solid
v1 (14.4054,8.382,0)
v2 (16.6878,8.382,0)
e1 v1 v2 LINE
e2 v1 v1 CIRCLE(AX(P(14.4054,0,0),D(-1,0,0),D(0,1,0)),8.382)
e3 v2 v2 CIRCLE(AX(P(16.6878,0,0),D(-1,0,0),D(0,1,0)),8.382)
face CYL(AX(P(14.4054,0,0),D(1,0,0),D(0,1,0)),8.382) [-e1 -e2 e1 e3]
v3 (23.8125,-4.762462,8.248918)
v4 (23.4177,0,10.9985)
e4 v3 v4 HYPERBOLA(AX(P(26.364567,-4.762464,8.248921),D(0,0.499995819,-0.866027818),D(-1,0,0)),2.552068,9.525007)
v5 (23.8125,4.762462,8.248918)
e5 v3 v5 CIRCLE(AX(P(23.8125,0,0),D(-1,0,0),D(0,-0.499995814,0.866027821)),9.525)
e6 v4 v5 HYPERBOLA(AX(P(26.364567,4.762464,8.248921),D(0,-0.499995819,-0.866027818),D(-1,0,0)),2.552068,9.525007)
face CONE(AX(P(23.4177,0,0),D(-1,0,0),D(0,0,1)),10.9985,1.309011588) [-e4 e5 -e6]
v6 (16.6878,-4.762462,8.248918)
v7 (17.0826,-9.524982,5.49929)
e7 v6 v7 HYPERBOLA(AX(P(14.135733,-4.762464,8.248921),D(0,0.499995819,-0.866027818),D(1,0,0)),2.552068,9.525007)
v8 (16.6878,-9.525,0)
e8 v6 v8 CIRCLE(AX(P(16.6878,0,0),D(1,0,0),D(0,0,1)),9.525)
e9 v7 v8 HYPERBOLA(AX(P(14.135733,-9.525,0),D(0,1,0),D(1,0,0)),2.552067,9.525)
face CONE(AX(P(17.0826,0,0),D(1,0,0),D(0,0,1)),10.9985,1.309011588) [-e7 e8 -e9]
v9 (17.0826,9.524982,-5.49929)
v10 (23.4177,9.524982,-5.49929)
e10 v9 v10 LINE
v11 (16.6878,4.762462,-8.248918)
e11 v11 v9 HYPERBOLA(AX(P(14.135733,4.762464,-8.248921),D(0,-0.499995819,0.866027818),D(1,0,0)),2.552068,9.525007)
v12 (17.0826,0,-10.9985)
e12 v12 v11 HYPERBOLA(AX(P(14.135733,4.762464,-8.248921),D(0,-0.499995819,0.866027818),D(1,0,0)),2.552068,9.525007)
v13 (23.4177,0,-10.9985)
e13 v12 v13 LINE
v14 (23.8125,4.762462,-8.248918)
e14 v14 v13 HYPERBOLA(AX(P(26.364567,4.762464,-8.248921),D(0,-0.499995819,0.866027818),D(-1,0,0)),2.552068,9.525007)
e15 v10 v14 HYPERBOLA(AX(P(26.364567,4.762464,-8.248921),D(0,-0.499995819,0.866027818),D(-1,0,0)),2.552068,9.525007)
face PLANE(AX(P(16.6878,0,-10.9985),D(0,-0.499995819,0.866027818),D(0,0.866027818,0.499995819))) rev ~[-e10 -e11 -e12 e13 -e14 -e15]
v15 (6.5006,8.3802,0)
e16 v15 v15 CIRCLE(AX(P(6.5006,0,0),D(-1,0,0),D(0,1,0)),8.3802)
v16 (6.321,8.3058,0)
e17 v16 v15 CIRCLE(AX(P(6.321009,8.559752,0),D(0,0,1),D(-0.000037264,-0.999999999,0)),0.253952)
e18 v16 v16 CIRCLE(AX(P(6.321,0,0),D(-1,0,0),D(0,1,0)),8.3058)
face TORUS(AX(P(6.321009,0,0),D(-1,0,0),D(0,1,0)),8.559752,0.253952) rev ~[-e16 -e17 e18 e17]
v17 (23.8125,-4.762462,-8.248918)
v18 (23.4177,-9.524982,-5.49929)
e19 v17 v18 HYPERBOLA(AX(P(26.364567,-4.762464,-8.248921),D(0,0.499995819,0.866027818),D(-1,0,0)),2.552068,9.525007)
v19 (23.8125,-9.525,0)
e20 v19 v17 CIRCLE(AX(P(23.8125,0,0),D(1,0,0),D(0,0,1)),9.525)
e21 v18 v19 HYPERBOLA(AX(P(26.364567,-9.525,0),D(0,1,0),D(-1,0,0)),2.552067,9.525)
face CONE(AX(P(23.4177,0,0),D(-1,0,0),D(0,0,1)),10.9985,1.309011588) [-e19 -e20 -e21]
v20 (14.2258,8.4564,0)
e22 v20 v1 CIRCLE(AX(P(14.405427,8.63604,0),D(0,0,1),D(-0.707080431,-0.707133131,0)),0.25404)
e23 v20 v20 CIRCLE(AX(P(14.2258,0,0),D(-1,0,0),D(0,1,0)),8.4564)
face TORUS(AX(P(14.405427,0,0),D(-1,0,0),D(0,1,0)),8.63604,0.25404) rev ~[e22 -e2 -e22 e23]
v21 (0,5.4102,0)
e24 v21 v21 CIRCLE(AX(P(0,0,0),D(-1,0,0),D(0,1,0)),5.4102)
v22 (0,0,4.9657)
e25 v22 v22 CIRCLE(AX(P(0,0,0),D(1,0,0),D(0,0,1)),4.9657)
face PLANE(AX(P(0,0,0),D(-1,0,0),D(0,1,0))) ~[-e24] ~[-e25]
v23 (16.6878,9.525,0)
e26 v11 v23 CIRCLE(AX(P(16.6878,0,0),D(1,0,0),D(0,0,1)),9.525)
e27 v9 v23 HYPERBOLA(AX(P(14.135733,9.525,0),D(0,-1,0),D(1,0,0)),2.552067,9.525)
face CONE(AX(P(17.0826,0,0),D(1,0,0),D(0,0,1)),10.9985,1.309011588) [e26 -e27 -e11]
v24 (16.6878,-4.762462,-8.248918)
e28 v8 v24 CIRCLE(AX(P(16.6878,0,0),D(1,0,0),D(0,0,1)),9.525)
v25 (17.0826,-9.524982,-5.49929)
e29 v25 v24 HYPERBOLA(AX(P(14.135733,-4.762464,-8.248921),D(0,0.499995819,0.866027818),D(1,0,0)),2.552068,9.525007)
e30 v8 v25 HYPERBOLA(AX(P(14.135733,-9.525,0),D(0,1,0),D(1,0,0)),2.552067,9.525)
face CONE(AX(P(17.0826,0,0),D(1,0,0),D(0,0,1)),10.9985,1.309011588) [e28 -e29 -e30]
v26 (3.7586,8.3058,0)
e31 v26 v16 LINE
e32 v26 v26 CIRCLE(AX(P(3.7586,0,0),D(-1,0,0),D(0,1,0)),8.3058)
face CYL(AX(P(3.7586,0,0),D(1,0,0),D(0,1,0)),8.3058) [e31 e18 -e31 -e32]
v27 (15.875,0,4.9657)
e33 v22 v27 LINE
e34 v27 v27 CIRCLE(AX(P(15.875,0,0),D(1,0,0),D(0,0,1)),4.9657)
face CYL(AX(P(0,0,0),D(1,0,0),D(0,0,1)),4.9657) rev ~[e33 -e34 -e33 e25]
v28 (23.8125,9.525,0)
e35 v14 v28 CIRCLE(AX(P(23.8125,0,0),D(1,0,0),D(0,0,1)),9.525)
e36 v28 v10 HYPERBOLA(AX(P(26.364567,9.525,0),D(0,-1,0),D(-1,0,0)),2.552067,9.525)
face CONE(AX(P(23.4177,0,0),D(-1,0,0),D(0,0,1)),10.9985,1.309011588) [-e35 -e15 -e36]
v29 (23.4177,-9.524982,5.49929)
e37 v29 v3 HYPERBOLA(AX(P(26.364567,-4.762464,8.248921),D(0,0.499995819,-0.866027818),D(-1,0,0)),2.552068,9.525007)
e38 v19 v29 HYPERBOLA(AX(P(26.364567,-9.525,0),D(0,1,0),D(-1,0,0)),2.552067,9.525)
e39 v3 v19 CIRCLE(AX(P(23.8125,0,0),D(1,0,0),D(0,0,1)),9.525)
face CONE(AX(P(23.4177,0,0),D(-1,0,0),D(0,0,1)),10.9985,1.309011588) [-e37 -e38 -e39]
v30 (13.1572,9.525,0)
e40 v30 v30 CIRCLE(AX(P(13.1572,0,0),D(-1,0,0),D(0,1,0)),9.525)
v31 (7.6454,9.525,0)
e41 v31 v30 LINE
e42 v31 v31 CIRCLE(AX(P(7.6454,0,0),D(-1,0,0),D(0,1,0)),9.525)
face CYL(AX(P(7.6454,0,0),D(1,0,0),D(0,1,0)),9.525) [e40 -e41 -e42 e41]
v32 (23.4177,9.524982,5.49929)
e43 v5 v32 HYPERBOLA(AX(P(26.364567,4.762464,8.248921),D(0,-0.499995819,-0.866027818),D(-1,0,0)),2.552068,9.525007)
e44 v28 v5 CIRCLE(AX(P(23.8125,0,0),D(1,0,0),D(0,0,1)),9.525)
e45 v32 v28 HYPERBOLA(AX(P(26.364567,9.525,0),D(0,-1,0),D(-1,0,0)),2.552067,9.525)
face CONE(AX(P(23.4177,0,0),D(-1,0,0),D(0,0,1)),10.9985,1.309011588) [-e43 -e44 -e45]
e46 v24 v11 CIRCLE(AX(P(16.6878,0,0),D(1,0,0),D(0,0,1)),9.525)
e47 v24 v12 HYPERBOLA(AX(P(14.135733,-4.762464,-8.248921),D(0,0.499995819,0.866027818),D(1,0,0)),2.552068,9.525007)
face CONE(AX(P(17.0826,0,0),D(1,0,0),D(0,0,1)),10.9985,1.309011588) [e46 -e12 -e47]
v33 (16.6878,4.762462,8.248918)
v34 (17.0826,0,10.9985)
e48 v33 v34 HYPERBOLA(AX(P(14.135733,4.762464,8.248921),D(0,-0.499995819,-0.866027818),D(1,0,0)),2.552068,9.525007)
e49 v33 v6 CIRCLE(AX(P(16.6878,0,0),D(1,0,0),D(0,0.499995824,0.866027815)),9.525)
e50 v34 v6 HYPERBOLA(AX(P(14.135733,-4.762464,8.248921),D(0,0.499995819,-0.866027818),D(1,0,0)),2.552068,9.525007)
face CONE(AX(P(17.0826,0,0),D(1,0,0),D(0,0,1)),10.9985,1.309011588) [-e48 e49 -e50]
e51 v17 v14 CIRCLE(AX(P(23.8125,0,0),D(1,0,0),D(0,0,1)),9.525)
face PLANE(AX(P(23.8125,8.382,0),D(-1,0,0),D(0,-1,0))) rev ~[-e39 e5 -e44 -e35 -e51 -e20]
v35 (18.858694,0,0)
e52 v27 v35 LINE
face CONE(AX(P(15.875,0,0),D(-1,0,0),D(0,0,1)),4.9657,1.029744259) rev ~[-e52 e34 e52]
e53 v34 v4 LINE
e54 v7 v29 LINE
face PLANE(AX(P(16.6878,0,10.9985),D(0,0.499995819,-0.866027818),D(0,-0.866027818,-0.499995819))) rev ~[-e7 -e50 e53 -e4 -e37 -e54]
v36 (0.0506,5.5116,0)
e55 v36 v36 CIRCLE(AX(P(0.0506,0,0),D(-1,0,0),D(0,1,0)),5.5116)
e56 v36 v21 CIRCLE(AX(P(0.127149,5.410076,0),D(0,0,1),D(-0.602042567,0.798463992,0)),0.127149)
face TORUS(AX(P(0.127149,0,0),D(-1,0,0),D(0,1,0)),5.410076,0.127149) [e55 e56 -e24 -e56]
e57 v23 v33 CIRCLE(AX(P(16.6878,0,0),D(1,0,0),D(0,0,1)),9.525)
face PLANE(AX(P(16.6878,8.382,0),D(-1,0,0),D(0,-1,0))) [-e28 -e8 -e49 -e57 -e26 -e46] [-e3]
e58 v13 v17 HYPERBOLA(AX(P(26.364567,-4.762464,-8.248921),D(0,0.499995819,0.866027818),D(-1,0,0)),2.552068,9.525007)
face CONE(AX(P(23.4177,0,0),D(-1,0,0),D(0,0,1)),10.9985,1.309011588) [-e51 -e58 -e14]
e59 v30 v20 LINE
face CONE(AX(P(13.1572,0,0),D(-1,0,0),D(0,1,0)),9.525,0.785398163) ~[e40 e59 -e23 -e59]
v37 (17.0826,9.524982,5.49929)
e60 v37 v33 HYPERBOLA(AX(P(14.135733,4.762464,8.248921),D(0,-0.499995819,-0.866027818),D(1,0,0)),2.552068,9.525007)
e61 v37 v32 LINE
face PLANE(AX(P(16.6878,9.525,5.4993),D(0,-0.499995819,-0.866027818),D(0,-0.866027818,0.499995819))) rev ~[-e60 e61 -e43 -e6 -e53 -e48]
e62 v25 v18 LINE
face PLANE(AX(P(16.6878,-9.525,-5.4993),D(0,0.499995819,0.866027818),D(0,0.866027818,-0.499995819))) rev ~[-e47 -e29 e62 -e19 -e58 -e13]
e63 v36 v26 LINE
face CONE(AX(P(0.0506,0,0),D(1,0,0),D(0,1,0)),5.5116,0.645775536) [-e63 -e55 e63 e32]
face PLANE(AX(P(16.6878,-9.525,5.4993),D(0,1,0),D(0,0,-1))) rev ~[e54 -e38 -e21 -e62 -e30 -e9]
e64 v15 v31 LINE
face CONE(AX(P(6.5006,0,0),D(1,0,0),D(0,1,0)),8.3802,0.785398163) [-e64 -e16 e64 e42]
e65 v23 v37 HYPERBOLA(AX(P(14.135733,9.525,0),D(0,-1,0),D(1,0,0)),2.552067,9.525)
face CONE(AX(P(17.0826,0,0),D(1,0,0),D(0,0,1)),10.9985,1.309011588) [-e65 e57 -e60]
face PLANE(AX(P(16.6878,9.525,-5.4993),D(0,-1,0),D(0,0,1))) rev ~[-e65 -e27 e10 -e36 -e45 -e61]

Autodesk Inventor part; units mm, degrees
ref_plane "YZ Plane" through (0, 0, 0) normal (1, 0, 0) x (0, 1, 0)
ref_plane "XZ Plane" through (0, 0, 0) normal (0, 1, 0) x (-1, 0, 0)
sketch "Sketch4" plane through (0, 0, 0) normal (0, 0, 1) x (1, 0, 0)
  line L0 (0, 0) -> (0, 5.4102)
  line L1 (0.0506, 5.5116) -> (3.7586, 8.3058)
  line L2 (3.7586, 8.3058) -> (6.321, 8.3058)
  line L3 (6.5006, 8.3802) -> (7.6454, 9.525)
  line L4 (7.6454, 9.525) -> (13.1572, 9.525)
  line L5 (13.1572, 9.525) -> (14.2258, 8.4564)
  line L6 (14.4054, 8.382) -> (16.6878, 8.382)
  line L7 (16.6878, 8.382) -> (16.6878, 0)
  line L8 (16.6878, 0) -> (0, 0)
  arc A0 (0.0506, 5.5116) -> (0, 5.4102) centre (0.127, 5.4102) ccw
  arc A1 (6.321, 8.3058) -> (6.5006, 8.3802) centre (6.321, 8.5598) ccw
  arc A2 (14.2258, 8.4564) -> (14.4054, 8.382) centre (14.4054, 8.636) ccw
  point P0 (6.4262, 8.3058)
  point P1 (14.3002, 8.382)
  dimension "d26" = 45
  dimension "d28" = 16.6878
  dimension "d29" = 0.127
  dimension "d30" = 5.4102
  dimension "d31" = 37
  dimension "d32" = 6.4262
  dimension "d33" = 8.3058
  dimension "d34" = 0.254
  dimension "d35" = 8.382
  dimension "d36" = 9.525
  dimension "d37" = 45
  dimension "d39" = 2.3876
revolve "Revolution3" add sketch "Sketch4" angle 360 about axis through (16.6878, 0, 0) along (-1, 0, 0)
ref_plane "Work Plane3" through (11.9062, 0, 0) normal (-1, 0, 0) x (0, 0, 1)
sketch "Sketch5" plane through (16.6878, 8.382, 0) normal (-1, 0, 0) x (0, -1, 0)
  line L0 (-1.143, 5.4993) -> (8.382, 10.9985)
  line L1 (8.382, 10.9985) -> (17.907, 5.4993)
  line L2 (17.907, 5.4993) -> (17.907, -5.4993)
  line L3 (17.907, -5.4993) -> (8.382, -10.9985)
  line L4 (8.382, -10.9985) -> (-1.143, -5.4993)
  line L5 (-1.143, -5.4993) -> (-1.143, 5.4993)
  circle A0 centre (8.382, 0) radius 10.9985 construction
  dimension "d42" = 21.9971
  dimension "d41" = 19.05
extrude "Extrusion2" add sketch "Sketch5" against normal blind 7.1247
sketch "Sketch7" plane through (0, 0, 0) normal (-1, 0, 0) x (0, 0, 1)
  circle A0 centre (0, 0) radius 5.4102 projected
hole "Hole1" at (0, 0, 0) direction (1, 0, 0) diameter 9.9314 depth 15.875 tip angle 118
thread "Thread3" size "3/4-16 UNF" class "3A" standard "ANSI Unified Screw Threads" full length
sketch "Sketch8" plane through (0, 0, 0) normal (0, 1, 0) x (-1, 0, 0)
  line L0 (-14.4054, 8.382) -> (-16.6878, 8.382) construction
  line L1 (-16.6878, 5.4993) -> (-16.6878, 10.9985) construction
  line L2 (-16.6878, 5.4993) -> (-16.6878, 10.9985) construction
  line L3 (-16.6878, 10.9985) -> (-23.8125, 10.9985) construction
  line L4 (-16.6878, 5.4993) -> (-23.8125, 5.4993) construction
  line L5 (-17.0826, 10.9985) -> (-16.6878, 9.525)
  line L6 (-17.0826, 10.9985) -> (-16.6878, 10.9985)
  line L7 (-16.6878, 9.525) -> (-16.6878, 10.9985)
  line L8 (-20.2502, 10.9985) -> (-20.2502, 5.4993)
  line L9 (-23.4177, 10.9985) -> (-23.8125, 9.525)
  line L10 (-23.4177, 10.9985) -> (-23.8125, 10.9985)
  line L11 (-23.8125, 9.525) -> (-23.8125, 10.9985)
  line L12 (8.8106, 0) -> (-52.8638, 0) projected
  line L13 (-23.8125, 5.4993) -> (-23.8125, 10.9985) projected
  point P0 (0, 0)
  point P1 (-23.8125, 10.9985)
  dimension "d62" = 9.525
  dimension "d64" = 15
revolve "Revolution5" cut sketch "Sketch8" angle 360 about axis through (-10, 0, 0) along (1, 0, 0)
equation "\"d28\" = MS33656_J"
equation "\"d30\" = 0.5 * MS33656_D"
equation "\"d32\" = MS33656_B"
equation "\"d33\" = 0.5 * MS33656_C"
equation "\"d35\" = 0.5 * MS33656_F"
equation "\"d36\" = 0.5 * AN806_T"
equation "\"d39\" = MS33656_Q"
equation "\"d41\" = AN806_C"
equation "\"d44\" = AN806_B - MS33656_J"
equation "\"d53\" = MS33656_A"
equation "\"d58\" = AN806_A"
equation "\"d62\" = 0.5 * AN806_C"
equation "\"AN806_T\" = 19.05"
equation "\"AN806_C\" = 19.05"
equation "\"AN806_B\" = 23.8125"
equation "\"MS33656_A\" = 9.9314"
equation "\"MS33656_D\" = 10.8204"
equation "\"MS33656_B\" = 6.4262"
equation "\"MS33656_C\" = 16.6116"
equation "\"MS33656_F\" = 16.764"
equation "\"MS33656_J\" = 16.6878"
equation "\"MS33656_Q\" = 2.3876"
equation "\"d79\" = -0.5 * AN806_B"
equation "\"Tube_OD\" = 12.7"
equation "\"AN806_A\" = 15.875"
properties part number "AN815-8D" material "Aluminum 2014-T6"
